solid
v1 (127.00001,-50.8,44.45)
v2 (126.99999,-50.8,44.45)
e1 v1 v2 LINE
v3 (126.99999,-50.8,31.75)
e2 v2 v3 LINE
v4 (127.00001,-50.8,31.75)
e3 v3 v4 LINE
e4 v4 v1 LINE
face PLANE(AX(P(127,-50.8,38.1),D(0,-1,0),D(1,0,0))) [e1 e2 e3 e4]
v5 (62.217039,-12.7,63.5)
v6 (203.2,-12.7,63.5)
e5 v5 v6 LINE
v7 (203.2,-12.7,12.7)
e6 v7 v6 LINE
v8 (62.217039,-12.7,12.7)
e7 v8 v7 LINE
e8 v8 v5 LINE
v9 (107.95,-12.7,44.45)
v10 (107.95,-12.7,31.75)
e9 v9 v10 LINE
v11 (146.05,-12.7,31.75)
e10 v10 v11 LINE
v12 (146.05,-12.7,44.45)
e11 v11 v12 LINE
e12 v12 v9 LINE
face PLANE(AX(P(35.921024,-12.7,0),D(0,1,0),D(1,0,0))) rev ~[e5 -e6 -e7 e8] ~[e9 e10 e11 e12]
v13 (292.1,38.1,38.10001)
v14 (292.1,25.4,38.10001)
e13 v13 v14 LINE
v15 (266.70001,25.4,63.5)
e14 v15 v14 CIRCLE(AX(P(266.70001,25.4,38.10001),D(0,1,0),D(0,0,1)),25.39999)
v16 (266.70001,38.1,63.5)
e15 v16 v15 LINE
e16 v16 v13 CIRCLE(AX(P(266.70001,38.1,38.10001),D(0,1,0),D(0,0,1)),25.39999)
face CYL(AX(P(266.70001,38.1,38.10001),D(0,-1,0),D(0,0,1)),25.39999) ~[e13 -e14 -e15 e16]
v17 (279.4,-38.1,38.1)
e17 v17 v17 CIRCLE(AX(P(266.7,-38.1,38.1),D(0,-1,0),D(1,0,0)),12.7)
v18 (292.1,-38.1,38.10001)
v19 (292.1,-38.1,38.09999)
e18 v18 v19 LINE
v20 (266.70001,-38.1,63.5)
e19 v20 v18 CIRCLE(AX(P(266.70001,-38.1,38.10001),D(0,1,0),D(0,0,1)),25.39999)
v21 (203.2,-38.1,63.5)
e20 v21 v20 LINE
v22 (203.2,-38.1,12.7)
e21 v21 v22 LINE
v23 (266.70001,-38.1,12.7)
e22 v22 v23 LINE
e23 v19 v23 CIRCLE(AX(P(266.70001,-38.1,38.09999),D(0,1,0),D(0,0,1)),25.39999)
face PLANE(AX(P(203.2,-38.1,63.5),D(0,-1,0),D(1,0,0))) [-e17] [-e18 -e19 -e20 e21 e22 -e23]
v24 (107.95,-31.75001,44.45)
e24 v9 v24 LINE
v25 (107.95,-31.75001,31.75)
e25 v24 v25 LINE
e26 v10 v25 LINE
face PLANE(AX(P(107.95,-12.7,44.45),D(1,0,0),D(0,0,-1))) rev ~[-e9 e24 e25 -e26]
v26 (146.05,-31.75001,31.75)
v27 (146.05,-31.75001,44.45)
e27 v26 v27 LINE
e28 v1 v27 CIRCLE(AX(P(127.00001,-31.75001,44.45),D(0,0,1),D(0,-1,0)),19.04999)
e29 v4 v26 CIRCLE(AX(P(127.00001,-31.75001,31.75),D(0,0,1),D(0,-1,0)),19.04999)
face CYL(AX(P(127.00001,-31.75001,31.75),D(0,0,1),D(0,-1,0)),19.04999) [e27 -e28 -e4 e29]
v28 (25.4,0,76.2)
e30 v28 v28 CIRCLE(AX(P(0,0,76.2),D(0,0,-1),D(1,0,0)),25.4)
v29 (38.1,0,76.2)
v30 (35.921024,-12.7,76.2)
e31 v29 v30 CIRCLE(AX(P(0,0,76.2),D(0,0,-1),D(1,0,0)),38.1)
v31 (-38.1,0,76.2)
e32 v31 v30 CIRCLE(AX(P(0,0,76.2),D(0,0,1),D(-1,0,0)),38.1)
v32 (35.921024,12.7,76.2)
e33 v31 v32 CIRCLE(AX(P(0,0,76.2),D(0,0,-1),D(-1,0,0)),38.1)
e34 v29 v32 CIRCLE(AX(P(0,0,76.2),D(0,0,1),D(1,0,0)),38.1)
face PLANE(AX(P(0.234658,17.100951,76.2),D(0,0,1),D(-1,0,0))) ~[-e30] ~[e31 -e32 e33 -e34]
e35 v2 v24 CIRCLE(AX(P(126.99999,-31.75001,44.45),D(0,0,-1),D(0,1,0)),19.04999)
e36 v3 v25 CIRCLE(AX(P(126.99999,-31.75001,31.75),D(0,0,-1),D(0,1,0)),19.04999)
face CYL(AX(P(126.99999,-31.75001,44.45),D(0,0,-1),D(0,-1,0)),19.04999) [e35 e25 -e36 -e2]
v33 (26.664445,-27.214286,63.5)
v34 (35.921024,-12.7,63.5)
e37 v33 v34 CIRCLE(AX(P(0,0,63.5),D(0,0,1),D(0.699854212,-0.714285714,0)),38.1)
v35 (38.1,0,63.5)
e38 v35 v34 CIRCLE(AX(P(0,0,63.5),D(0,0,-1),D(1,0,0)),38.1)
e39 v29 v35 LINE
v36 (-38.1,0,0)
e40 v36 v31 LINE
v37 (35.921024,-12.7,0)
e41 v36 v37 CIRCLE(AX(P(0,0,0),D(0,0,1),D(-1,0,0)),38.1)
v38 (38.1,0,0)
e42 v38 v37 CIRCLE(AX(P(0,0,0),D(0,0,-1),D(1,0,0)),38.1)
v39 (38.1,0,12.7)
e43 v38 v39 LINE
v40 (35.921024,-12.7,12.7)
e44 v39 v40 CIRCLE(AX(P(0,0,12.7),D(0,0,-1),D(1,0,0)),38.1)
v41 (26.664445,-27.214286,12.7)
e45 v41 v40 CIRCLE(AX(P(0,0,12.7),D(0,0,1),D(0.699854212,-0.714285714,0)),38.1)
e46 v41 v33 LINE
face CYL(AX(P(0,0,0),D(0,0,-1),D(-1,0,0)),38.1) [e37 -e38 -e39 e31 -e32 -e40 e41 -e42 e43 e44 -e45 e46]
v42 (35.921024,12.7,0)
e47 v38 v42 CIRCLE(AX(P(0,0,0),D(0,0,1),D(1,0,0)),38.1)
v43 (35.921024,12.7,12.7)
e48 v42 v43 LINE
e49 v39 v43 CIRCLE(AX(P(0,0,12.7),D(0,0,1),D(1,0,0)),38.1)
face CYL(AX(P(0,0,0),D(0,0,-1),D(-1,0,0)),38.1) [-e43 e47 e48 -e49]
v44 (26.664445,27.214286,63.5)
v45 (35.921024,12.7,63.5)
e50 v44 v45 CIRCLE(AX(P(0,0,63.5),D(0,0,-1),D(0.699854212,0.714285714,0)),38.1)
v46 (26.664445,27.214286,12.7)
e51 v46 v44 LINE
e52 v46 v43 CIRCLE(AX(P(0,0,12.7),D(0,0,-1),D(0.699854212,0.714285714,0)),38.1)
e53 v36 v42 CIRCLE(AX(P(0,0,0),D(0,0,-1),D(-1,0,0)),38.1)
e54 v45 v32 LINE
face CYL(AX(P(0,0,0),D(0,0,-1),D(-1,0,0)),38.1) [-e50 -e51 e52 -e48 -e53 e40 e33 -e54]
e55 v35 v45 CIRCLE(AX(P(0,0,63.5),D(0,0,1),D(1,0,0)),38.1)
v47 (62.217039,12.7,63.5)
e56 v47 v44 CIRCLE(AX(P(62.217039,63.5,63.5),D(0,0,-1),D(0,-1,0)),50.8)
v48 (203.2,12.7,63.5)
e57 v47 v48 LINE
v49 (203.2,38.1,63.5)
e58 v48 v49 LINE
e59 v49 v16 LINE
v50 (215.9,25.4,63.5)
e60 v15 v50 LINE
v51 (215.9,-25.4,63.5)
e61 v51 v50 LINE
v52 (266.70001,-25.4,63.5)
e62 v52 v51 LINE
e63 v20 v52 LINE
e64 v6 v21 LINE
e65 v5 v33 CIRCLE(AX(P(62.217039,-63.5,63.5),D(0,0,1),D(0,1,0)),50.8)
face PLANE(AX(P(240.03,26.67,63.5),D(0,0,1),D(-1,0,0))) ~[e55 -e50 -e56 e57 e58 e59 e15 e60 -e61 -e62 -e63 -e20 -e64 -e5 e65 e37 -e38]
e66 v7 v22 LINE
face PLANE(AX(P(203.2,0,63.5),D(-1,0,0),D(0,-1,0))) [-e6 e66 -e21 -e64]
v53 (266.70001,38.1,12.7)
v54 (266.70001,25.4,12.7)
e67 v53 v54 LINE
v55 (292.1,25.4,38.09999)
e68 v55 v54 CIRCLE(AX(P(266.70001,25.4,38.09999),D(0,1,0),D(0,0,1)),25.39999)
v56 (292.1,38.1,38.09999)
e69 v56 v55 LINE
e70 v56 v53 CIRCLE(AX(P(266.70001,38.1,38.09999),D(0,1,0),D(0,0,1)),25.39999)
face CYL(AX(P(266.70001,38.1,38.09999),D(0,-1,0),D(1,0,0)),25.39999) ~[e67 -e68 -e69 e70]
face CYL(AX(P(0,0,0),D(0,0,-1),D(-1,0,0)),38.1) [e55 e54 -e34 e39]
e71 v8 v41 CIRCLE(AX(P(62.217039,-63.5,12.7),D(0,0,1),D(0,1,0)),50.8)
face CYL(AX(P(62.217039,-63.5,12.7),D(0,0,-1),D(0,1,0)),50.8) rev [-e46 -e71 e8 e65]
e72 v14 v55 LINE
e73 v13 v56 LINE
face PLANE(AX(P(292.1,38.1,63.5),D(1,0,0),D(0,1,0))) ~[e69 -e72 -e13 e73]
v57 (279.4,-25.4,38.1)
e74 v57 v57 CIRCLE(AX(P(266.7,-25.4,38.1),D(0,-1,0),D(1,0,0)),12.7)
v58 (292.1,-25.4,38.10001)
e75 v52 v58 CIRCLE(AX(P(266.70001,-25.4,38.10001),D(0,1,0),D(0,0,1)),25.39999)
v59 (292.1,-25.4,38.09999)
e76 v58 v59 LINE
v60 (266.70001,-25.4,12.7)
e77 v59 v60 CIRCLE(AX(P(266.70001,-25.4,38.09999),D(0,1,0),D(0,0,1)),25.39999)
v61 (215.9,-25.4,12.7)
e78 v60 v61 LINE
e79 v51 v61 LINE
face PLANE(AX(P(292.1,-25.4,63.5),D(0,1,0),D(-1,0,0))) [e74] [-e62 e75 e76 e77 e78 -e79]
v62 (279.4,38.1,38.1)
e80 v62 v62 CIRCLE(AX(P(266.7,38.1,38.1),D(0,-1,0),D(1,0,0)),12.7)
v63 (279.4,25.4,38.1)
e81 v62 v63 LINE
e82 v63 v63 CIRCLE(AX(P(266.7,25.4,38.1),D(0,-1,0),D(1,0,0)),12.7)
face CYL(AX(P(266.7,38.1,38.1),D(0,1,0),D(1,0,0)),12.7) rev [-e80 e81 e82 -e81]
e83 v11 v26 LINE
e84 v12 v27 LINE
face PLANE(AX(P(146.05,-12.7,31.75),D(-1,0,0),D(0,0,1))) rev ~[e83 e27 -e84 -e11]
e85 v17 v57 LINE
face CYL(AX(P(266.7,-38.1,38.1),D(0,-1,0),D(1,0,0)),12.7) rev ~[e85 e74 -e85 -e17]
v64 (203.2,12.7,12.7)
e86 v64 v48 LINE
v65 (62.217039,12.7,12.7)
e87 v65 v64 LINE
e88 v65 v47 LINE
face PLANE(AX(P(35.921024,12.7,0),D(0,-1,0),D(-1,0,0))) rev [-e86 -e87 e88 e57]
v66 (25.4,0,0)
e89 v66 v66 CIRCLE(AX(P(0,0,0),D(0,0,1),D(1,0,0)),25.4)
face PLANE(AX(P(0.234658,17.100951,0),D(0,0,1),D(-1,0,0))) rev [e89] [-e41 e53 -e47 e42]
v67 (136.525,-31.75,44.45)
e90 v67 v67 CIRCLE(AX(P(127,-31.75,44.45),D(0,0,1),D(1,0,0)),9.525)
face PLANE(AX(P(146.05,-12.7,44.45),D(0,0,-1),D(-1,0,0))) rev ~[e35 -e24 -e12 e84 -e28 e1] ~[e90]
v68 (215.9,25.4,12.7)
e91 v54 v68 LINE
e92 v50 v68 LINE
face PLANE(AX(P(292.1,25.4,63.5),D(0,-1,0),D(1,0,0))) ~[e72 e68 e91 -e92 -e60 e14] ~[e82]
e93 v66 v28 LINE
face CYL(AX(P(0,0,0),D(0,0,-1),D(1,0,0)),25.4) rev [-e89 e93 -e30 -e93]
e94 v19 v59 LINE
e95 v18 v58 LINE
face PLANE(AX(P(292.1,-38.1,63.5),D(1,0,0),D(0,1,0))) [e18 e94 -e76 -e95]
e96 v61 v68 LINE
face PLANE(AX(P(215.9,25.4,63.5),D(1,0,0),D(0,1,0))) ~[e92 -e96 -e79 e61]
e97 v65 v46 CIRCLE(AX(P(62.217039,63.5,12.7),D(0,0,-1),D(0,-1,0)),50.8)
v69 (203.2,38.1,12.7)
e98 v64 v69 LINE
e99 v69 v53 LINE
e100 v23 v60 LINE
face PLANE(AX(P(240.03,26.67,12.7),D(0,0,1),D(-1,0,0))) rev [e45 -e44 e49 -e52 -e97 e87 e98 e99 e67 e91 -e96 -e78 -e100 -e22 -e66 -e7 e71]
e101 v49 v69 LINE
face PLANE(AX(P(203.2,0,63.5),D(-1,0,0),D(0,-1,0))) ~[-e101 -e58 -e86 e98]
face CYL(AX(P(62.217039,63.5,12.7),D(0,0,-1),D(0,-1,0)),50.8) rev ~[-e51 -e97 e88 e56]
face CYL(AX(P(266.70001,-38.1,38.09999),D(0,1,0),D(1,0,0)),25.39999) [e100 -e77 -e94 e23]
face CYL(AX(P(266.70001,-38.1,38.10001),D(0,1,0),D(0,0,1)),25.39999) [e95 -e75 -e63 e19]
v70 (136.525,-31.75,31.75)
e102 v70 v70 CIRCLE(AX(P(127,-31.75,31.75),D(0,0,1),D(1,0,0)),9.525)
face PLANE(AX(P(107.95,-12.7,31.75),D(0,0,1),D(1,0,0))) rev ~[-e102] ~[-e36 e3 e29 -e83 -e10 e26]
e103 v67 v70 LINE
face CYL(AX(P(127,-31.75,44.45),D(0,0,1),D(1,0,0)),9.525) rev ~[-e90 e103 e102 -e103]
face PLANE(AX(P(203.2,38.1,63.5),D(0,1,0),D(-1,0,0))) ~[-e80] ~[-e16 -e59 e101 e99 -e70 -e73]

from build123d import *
from build123d import SkipClean  # not in build123d's __all__

# Parameters (mm, degrees)
F1_DEPTH    = 76.2
F3_DEPTH    = 12.7
F4_DEPTH    = 12.7
F5_T1_DEPTH = 50.8
F7_DEPTH    = 50.8
F8_R        = 25.39999
F9_R        = 12.7
F10_DEPTH   = 12.7
F13_DEPTH   = 38.1
F14_R       = 19.04999
F15_R       = 9.525
F16_DEPTH   = 12.7


# Not quite as in the source:
# - a fillet or chamfer that OpenCascade refuses, or shapes differently, is made with other operations: its cross-section is extruded or revolved along the edge and cut away or added
# - a fillet or chamfer is up to 0.001 mm smaller than in the source, because OpenCascade refuses the exact size


with BuildPart() as f1:
    # F0 (on Top) → F1 (new body)
    with BuildSketch(Plane.XY):
        with BuildLine():
            Line((-25.4, 0), (-38.1, 0))
            ThreePointArc((-38.1, 0), (-6.4427853895, -37.5513051228), (35.9210244843, -12.7))
            ThreePointArc((35.9210244843, -12.7), (37.5513051228, -6.4427853895), (38.1, 0))
            Line((38.1, 0), (25.4, 0))
            ThreePointArc((25.4, 0), (0, -25.4), (-25.4, 0))
        make_face()
        with BuildLine():
            ThreePointArc((38.1, 0), (37.5513051228, -6.4427853895), (35.9210244843, -12.7))
            Line((35.9210244843, -12.7), (203.2, -12.7))
            Line((203.2, -12.7), (203.2, 0))
            Line((203.2, 0), (38.1, 0))
        make_face()
    extrude(amount=F1_DEPTH)

    # F2 (on face) → F3 (cut)
    with BuildSketch(Plane.XY.offset(76.2)):
        with BuildLine():
            ThreePointArc((38.1, 0), (37.5513051228, -6.4427853895), (35.9210244843, -12.7))
            Line((35.9210244843, -12.7), (203.2, -12.7))
            Line((203.2, -12.7), (203.2, 0))
            Line((203.2, 0), (38.1, 0))
        make_face()
    extrude(amount=-F3_DEPTH, mode=Mode.SUBTRACT)

    # F0 (on Top) → F4 (cut)
    with BuildSketch(Plane.XY):
        with BuildLine():
            ThreePointArc((38.1, 0), (37.5513051228, -6.4427853895), (35.9210244843, -12.7))
            Line((35.9210244843, -12.7), (203.2, -12.7))
            Line((203.2, -12.7), (203.2, 0))
            Line((203.2, 0), (38.1, 0))
        make_face()
    extrude(amount=F4_DEPTH, mode=Mode.SUBTRACT)

    # F5: fillet of radius 50.8 on 1 edges, made by hand

    # F5_s2 → F5_t1 (join)
    with BuildSketch(Plane.XY.offset(12.7)):
        with BuildLine():
            ThreePointArc((62.2170394667, -12.7), (43.0164442378, -16.4683389316), (26.6644454857, -27.2142857143))
            ThreePointArc((26.6644454857, -27.2142857143), (32.1232219008, -20.4867912253), (35.9210244843, -12.7))
            Line((35.9210244843, -12.7), (62.2170394667, -12.7))
        make_face()
    extrude(amount=F5_T1_DEPTH)

    # F6 (on face) → F7 (join, through all)
    with BuildSketch(Plane.XY.offset(63.5)):
        Polygon((215.9, 0), (203.2, 0), (203.2, -12.7), (203.2, -38.1), (292.1, -38.1), (292.1, -25.4), (215.9, -25.4), align=None)
    extrude(amount=-F7_DEPTH)

    # F8 (radius 25.4 in the source; OpenCascade refuses exactly that, so slightly less here)
    f8_edges = [f1.edges().sort_by_distance(p)[0] for p in [
        (292.1, -31.75, 63.5),
        (292.1, -31.75, 12.7),
    ]]
    fillet(f8_edges, radius=F8_R)

    # F9 (on face) → F10 (cut, through all)
    with BuildSketch(Plane.XZ.offset(38.1)):
        with Locations((266.7, 38.1)):
            Circle(F9_R)
    extrude(amount=-F10_DEPTH, mode=Mode.SUBTRACT)

    # F11: F1 across plane


with BuildPart() as f1_1:
    add(f1.part, clean=False)
    with SkipClean():  # cleaning this boolean's faces spoils the solid; the shape is the same uncleaned
        add(f1.part.mirror(Plane.XZ), clean=False)

    # F12 (on face) → F13 (join)
    with BuildSketch(Plane.XZ.offset(12.7)):
        Polygon((146.05, 44.45), (127, 44.45), (107.95, 44.45), (107.95, 31.75), (127, 31.75), (146.05, 31.75), align=None)
    extrude(amount=F13_DEPTH)

    # F14 (radius 19.05 in the source; OpenCascade refuses exactly that, so slightly less here)
    f14_edges = [f1_1.edges().sort_by_distance(p)[0] for p in [
        (107.95, -50.8, 38.1),
        (146.05, -50.8, 38.1),
    ]]
    fillet(f14_edges, radius=F14_R)

    # F15 (on face) → F16 (cut, through all)
    with BuildSketch(Plane.XY.offset(44.45)):
        with Locations((127, -31.75)):
            Circle(F15_R)
    extrude(amount=-F16_DEPTH, mode=Mode.SUBTRACT)


solid = f1_1.part
